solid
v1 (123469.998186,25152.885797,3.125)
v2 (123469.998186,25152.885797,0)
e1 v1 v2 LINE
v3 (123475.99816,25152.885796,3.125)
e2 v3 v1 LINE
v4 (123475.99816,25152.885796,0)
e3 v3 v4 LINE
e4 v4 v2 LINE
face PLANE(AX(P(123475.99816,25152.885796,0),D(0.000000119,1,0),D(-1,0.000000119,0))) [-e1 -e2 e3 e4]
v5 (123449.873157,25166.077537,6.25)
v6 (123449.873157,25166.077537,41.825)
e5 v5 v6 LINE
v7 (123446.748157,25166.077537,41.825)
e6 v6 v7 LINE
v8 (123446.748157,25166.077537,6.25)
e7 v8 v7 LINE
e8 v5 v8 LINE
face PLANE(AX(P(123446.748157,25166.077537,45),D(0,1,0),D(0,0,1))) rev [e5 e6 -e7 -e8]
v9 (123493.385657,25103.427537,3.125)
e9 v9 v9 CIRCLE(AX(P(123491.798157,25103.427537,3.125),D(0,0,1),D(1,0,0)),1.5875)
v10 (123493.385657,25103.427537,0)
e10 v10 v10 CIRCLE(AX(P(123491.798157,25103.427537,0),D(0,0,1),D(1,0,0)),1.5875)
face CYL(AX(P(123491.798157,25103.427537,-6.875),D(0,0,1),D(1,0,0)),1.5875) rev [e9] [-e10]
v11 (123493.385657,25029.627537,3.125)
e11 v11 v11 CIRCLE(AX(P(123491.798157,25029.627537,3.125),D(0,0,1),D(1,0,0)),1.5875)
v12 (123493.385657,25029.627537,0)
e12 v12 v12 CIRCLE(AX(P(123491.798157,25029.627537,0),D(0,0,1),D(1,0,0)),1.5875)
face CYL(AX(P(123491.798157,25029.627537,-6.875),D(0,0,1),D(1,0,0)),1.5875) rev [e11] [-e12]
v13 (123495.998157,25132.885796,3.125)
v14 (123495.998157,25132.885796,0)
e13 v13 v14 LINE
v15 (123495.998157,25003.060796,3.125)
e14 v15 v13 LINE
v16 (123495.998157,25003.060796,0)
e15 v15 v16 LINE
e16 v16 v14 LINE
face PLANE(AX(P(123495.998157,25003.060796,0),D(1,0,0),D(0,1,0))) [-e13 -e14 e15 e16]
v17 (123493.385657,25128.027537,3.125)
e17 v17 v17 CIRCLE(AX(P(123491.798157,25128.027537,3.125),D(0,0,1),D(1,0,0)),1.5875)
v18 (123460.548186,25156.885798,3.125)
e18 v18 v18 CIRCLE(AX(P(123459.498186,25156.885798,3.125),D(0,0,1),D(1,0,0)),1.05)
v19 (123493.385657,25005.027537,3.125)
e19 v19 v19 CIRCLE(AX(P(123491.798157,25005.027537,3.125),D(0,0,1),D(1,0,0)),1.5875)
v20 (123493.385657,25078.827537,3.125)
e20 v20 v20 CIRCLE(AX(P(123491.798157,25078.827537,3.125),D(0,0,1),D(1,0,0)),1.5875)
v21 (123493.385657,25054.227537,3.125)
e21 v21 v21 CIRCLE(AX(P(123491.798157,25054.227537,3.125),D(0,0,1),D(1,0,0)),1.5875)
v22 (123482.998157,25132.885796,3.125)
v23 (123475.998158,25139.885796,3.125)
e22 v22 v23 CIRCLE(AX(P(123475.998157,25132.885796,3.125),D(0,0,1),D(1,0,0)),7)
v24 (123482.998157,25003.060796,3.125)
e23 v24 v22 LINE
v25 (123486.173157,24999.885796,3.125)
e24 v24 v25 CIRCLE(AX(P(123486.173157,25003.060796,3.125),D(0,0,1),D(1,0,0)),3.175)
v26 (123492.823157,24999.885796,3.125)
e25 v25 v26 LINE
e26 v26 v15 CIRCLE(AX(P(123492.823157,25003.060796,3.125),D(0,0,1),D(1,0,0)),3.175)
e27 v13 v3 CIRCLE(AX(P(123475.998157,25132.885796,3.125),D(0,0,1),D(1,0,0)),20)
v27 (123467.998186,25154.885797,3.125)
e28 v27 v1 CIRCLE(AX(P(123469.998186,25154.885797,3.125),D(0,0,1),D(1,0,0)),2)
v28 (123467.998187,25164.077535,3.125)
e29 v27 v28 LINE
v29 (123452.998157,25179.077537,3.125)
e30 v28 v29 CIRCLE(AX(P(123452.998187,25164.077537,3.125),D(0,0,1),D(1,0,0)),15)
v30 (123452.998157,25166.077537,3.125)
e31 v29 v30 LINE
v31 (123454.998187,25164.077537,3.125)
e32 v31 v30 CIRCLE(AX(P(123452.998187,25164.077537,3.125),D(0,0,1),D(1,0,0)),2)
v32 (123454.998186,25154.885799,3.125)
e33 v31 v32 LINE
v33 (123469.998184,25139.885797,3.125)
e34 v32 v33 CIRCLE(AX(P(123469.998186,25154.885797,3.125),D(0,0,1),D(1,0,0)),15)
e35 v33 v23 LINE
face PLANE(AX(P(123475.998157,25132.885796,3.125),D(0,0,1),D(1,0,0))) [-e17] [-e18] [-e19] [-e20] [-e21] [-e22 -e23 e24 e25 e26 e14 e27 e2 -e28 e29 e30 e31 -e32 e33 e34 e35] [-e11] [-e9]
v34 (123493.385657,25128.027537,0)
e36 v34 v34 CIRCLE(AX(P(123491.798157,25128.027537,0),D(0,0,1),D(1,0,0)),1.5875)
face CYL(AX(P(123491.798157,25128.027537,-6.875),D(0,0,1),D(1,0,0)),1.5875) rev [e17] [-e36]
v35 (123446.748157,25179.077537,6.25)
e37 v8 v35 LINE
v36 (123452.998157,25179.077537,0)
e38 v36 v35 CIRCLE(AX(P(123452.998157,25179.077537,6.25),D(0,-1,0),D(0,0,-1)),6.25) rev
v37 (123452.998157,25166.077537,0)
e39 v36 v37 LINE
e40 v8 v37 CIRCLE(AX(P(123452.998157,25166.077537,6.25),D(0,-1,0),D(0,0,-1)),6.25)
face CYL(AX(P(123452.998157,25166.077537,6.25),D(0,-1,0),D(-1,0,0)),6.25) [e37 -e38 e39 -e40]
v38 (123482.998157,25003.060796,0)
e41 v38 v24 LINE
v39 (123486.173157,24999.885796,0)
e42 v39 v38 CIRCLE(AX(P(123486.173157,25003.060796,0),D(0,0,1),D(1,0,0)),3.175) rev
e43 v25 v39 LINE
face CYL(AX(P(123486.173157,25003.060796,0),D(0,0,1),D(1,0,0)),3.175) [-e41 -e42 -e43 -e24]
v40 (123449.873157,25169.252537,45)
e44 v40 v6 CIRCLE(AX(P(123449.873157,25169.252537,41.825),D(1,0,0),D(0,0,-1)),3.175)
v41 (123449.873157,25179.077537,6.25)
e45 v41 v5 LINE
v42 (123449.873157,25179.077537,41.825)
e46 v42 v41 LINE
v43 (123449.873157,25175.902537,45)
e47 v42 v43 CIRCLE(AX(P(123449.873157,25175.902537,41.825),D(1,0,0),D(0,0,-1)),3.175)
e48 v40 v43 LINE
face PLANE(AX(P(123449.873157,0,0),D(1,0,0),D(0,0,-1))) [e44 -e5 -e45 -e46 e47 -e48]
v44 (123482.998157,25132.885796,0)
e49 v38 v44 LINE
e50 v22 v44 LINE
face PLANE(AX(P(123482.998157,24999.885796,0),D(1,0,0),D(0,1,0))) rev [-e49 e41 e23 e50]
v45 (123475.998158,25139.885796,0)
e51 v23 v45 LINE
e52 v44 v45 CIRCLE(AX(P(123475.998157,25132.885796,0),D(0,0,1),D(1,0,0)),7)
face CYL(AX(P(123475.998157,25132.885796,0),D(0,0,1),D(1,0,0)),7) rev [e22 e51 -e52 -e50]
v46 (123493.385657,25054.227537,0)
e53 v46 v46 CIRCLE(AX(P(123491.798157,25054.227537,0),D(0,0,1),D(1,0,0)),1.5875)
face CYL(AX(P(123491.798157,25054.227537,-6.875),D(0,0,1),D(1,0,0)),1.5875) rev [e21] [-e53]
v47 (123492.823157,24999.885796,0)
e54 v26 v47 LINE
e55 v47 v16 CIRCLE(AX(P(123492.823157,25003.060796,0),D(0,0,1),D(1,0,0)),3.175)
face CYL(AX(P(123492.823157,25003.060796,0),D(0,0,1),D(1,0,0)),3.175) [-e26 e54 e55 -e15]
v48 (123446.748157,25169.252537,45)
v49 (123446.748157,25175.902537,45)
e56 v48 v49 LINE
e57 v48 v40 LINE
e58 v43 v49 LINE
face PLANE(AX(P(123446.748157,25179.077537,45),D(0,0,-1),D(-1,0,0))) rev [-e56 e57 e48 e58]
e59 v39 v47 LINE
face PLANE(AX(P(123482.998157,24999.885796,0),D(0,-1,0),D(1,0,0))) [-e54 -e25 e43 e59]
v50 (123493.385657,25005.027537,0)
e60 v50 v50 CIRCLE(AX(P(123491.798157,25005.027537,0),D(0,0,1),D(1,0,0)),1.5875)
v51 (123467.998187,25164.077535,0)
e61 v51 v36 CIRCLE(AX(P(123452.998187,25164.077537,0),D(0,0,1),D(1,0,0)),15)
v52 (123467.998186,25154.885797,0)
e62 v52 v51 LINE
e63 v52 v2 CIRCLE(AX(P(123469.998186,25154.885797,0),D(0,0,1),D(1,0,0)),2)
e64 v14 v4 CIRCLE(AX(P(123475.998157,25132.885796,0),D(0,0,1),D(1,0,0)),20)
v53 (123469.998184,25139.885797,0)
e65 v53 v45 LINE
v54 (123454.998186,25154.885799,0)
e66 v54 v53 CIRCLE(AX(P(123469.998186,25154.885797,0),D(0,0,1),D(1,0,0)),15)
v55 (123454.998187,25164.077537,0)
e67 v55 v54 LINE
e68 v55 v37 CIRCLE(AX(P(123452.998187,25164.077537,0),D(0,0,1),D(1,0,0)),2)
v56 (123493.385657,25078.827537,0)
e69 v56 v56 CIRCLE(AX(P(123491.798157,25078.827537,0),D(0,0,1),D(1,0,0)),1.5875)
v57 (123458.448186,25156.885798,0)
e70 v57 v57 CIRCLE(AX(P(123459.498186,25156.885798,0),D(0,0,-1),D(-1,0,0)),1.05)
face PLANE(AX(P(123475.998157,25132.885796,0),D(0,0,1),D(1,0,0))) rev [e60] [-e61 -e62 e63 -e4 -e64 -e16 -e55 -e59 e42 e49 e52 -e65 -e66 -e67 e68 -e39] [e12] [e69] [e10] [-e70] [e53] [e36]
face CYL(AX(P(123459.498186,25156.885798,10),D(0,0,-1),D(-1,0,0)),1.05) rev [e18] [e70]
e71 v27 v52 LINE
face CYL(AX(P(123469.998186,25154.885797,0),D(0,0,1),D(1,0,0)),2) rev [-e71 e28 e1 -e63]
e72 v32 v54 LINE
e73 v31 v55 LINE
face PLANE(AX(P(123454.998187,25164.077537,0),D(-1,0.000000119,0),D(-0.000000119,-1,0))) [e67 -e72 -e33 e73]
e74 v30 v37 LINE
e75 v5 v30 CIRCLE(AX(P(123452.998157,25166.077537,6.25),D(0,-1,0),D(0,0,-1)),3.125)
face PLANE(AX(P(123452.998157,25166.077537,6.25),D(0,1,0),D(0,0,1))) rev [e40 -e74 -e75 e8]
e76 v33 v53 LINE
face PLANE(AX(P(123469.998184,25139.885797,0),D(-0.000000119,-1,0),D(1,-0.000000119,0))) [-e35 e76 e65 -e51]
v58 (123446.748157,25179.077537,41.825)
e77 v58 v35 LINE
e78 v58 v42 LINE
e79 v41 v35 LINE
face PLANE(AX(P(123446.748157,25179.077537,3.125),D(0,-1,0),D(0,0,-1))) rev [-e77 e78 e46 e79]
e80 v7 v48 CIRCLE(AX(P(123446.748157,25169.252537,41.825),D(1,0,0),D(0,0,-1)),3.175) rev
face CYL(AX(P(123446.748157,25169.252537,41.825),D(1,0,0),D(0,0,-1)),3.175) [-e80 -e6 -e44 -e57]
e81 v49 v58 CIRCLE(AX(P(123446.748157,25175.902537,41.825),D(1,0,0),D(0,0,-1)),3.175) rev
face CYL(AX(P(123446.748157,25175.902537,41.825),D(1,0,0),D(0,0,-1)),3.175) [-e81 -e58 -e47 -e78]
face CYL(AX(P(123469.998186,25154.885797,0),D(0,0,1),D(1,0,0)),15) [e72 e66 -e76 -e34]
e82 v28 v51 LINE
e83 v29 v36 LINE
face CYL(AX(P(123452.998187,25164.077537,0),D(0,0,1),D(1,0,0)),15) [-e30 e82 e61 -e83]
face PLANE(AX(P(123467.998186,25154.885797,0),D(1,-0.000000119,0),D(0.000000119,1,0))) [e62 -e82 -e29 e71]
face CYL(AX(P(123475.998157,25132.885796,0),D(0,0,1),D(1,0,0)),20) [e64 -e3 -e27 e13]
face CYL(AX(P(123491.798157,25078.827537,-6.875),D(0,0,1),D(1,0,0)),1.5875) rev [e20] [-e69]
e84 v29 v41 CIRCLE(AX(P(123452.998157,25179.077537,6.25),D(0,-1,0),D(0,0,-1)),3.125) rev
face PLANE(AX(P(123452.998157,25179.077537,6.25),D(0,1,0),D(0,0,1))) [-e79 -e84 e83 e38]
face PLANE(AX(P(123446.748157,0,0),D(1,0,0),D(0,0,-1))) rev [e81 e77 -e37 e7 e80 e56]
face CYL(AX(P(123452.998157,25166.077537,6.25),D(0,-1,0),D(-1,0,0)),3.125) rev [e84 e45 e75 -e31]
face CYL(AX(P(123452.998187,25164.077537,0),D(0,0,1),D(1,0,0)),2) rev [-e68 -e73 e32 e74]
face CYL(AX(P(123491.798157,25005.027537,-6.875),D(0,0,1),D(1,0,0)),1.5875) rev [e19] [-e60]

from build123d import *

# Parameters (mm, degrees)
BOSS_EXTRUDE1_DEPTH = 3.125
EDGE_FLANGE1_DEPTH  = 13
FILLET1_R           = 3.175
SKETCH10_R          = 1.5875
CUT_EXTRUDE1_DEPTH  = 10
LPATTERN1_COUNT     = 6
LPATTERN1_PITCH     = 24.6
SKETCH13_R          = 1.05
CUT_EXTRUDE2_DEPTH  = 10


# Sheet-metal steps are written as plain solids
with BuildPart() as part:
    # Sketch1 → Boss-Extrude1 (new body)
    with BuildSketch(Plane.XY):
        with BuildLine():
            Line((123482.998157255, 24999.885796135), (123482.998157255, 25132.885796135))
            ThreePointArc((123482.998157255, 25132.885796135), (123482.99666513, 25133.030321276), (123482.992189393, 25133.174784804))
            ThreePointArc((123482.992189393, 25133.174784804), (123480.844655225, 25137.936682931), (123475.998158089, 25139.885796135))
            Line((123475.998158089, 25139.885796135), (123469.998184079, 25139.88579685))
            ThreePointArc((123469.998184079, 25139.88579685), (123459.391582886, 25144.279196396), (123454.998185868, 25154.885798636))
            Line((123454.998185868, 25154.885798636), (123454.998186963, 25164.077536847))
            ThreePointArc((123454.998186963, 25164.077536847), (123454.412390106, 25165.491761067), (123452.998157255, 25166.077537085))
            Line((123452.998157255, 25166.077537085), (123452.998157255, 25179.077537085))
            ThreePointArc((123452.998157255, 25179.077537085), (123463.604778809, 25174.684148675), (123467.998186963, 25164.077535299))
            Line((123467.998186963, 25164.077535299), (123467.998185868, 25154.885797087))
            ThreePointArc((123467.998185868, 25154.885797087), (123468.583972137, 25153.471583456), (123469.998185629, 25152.88579685))
            Line((123469.998185629, 25152.88579685), (123475.998159637, 25152.885796136))
            ThreePointArc((123475.998159637, 25152.885796136), (123490.140293721, 25147.027930917), (123495.998157255, 25132.885796135))
            Line((123495.998157255, 25132.885796135), (123495.998157255, 25003.060796135))
            ThreePointArc((123495.998157255, 25003.060796135), (123495.068221285, 25000.815732105), (123492.823157255, 24999.885796135))
            Line((123492.823157255, 24999.885796135), (123482.998157255, 24999.885796135))
        make_face()
    extrude(amount=BOSS_EXTRUDE1_DEPTH)

    # Edge-Flange1 section (across the edge) → Edge-Flange1 (add)
    with BuildSketch(Plane(origin=(123449.873157255, 25179.077537085, 3.125), x_dir=(1, 0, 0), z_dir=(0, -1, 0))):
        with BuildLine():
            Line((-3.125, 3.125), (-3.125, 41.875))
            Line((-3.125, 41.875), (0, 41.875))
            Line((0, 41.875), (0, 3.125))
            ThreePointArc((0, 3.125), (0.915291309, 0.915291309), (3.125, 0))
            Line((3.125, 0), (3.125, -3.125))
            ThreePointArc((3.125, -3.125), (-1.294417382, -1.294417382), (-3.125, 3.125))
        make_face()
    extrude(amount=EDGE_FLANGE1_DEPTH)

    # Fillet1
    fillet1_edges = [part.edges().sort_by_distance(p)[0] for p in [
        (123482.998157255, 24999.885796135, 1.5625),
        (123448.310657255, 25179.077537085, 45),
        (123448.310657255, 25166.077537085, 45),
    ]]
    fillet(fillet1_edges, radius=FILLET1_R)

    # Sketch10 → Cut-Extrude1 (cut)
    with BuildSketch(Plane.XY.offset(3.125)):
        with Locations((123491.798157255, 25005.027537086)):
            Circle(SKETCH10_R)
    cut_extrude1 = extrude(amount=-CUT_EXTRUDE1_DEPTH, mode=Mode.SUBTRACT)

    # LPattern1: Cut-Extrude1 ×6
    with Locations(*[(0, i * LPATTERN1_PITCH, 0) for i in range(1, LPATTERN1_COUNT)]):
        add(cut_extrude1, mode=Mode.SUBTRACT)

    # Sketch13 → Cut-Extrude2 (cut)
    with BuildSketch(Plane(origin=(0, 0, 0), x_dir=(-1, 0, 0), z_dir=(0, 0, -1))):
        with Locations((-123459.498186107, 25156.8857981)):
            Circle(SKETCH13_R)
    extrude(amount=-CUT_EXTRUDE2_DEPTH, mode=Mode.SUBTRACT)


solid = part.part
